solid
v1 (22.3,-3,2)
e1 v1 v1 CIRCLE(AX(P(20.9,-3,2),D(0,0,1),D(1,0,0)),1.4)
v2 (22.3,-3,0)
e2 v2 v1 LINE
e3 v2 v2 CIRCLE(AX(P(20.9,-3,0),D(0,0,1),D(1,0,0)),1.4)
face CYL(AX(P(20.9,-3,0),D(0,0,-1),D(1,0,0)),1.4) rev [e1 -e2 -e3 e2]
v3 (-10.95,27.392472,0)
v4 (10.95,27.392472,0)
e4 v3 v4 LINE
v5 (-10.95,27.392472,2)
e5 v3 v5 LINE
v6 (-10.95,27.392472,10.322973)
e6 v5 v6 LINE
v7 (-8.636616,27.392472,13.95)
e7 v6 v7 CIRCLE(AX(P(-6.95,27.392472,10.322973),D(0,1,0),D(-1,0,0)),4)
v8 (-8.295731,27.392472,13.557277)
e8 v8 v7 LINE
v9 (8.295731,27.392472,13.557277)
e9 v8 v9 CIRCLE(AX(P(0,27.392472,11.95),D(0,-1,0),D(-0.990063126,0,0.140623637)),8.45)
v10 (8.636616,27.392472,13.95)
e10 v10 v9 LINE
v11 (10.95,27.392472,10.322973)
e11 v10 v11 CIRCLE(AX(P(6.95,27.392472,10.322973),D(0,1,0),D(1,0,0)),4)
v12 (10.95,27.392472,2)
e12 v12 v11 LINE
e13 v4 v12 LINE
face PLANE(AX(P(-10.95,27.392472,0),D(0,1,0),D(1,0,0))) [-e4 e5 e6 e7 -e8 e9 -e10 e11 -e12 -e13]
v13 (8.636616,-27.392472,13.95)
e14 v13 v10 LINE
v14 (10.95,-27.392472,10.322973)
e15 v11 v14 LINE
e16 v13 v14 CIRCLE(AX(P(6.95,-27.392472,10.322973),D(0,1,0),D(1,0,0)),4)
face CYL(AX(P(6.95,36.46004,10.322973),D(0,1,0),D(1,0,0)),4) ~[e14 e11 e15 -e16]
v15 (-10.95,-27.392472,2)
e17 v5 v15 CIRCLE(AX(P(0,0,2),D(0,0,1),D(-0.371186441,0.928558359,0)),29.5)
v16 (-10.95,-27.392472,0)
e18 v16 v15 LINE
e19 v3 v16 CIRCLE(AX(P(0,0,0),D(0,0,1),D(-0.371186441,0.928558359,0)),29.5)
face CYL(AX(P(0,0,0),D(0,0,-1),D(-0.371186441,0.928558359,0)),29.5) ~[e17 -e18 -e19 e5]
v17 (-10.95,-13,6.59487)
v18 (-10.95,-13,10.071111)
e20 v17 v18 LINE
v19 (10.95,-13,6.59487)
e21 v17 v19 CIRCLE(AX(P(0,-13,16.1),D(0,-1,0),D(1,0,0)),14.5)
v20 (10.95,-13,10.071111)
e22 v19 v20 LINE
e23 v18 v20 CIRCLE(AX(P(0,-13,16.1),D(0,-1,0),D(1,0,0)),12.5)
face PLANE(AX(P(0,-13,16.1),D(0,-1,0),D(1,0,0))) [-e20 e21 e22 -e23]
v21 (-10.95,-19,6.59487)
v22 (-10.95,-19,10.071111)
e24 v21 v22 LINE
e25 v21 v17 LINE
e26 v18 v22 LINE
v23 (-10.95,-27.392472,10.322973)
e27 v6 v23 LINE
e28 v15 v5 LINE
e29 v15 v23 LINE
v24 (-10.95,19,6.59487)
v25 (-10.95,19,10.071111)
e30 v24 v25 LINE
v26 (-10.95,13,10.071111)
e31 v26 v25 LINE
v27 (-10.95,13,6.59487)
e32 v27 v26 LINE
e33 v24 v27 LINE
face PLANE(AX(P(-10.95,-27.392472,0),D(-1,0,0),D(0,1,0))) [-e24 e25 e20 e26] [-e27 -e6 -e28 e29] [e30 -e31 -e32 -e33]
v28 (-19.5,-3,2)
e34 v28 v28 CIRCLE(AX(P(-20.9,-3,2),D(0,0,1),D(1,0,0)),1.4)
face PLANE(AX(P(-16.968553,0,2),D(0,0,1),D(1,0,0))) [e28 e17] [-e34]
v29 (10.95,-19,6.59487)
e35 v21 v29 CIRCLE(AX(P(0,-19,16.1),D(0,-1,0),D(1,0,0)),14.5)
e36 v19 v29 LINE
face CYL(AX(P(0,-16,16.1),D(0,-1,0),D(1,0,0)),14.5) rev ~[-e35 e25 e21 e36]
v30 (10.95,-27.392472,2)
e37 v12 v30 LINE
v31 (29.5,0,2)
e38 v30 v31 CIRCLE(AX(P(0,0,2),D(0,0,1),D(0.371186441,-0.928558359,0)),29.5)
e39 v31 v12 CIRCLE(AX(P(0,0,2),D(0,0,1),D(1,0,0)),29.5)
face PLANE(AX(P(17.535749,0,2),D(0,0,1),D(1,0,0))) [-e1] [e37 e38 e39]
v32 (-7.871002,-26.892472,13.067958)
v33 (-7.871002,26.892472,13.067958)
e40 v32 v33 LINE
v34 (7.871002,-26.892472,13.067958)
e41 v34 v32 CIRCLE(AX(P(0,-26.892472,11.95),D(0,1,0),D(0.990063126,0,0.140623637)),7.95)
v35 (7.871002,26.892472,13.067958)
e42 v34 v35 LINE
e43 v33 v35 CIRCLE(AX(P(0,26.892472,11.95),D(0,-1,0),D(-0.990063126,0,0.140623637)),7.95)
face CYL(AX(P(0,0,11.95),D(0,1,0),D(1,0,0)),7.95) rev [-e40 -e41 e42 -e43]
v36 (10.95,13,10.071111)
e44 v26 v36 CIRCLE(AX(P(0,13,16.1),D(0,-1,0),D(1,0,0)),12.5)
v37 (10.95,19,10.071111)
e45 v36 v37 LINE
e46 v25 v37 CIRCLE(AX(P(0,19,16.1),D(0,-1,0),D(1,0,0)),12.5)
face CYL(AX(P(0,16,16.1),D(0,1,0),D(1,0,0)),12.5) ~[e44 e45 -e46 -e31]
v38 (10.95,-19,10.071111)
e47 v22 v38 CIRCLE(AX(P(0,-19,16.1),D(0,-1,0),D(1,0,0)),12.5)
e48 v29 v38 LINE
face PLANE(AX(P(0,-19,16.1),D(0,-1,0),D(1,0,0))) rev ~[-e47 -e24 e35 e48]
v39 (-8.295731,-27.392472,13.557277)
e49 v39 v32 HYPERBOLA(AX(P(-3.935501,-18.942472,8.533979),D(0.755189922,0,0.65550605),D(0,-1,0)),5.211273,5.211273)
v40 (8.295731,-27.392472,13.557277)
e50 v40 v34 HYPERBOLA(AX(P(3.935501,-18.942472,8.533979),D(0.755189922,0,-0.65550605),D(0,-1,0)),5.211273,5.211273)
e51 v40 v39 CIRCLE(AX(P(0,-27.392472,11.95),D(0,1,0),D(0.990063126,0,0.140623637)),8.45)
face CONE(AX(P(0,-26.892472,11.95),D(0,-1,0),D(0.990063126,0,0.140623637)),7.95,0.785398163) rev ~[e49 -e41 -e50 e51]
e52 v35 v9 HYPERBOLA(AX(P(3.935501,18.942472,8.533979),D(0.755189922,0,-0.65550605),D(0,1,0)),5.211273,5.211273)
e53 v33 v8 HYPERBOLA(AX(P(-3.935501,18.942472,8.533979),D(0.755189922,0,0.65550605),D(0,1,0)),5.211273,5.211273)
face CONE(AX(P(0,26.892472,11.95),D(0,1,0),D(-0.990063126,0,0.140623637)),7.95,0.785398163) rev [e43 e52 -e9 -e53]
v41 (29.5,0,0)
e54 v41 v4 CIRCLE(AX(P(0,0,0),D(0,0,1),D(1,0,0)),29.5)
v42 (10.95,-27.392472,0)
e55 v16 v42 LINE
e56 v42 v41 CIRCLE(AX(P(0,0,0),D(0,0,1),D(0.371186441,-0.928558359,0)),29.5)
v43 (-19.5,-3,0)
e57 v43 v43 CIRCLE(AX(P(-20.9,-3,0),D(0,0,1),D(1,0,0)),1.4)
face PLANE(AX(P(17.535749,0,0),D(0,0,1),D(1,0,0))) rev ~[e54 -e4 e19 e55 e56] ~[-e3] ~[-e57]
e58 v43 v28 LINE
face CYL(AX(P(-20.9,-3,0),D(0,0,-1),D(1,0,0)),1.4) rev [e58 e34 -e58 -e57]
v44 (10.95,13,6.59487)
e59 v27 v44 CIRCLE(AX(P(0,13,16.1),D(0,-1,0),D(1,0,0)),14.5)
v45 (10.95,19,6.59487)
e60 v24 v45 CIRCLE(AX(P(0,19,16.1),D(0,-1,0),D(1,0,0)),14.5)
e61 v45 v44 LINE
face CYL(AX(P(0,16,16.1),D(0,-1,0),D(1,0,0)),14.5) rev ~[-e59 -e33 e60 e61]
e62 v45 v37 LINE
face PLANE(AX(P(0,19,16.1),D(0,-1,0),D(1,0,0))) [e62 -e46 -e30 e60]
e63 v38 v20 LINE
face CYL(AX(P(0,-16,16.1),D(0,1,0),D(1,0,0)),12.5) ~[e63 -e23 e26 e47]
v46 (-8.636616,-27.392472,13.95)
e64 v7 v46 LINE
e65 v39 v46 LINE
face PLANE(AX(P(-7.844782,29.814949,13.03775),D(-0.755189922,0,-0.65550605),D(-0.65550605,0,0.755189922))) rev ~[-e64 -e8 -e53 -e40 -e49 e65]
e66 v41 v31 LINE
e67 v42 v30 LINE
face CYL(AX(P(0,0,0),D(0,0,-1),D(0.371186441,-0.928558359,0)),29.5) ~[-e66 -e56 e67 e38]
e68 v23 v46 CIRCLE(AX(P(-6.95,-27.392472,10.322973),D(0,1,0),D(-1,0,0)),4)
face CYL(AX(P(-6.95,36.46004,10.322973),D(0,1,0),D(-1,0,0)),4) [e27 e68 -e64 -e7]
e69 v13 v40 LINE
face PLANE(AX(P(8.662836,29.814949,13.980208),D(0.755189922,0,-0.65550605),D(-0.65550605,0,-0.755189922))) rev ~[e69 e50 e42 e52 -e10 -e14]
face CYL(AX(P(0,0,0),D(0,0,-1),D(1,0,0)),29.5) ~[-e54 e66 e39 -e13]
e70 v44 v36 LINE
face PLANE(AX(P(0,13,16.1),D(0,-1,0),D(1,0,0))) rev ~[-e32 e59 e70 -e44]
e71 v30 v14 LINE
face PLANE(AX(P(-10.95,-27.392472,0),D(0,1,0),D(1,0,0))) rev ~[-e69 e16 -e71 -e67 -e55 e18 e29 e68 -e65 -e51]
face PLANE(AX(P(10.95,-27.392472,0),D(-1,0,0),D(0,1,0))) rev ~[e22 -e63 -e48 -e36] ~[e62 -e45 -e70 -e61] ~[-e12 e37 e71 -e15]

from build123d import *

# Parameters (mm, degrees)
F0_W          = 21.9
F0_H          = 54.784943187
F2_DEPTH      = 13.95
F0_R          = 1.4
F3_DEPTH      = 2
F1_R          = 7.95
F4_DEPTH      = 27.3934715935
F4_DEPTH_BACK = 27.3934715935
F7_R          = 14.5
F7_R_2        = 12.5
F8_R          = 14.5
F8_R_2        = 12.5
F9_DEPTH      = 3
F10_T1_DEPTH  = 59.6298977105
F11_T1_DEPTH  = 72.9200798033
F12_SIZE      = 0.5


# Not quite as in the source:
# - a fillet or chamfer that OpenCascade refuses, or shapes differently, is made with other operations: its cross-section is extruded or revolved along the edge and cut away or added


with BuildPart() as f2:
    # F0 (on Top) → F2 (new body)
    with BuildSketch(Plane.XY):
        Rectangle(F0_W, F0_H)
    extrude(amount=F2_DEPTH)

    # F0 (on Top) → F3 (join)
    with BuildSketch(Plane.XY):
        with BuildLine():
            ThreePointArc((10.95, -27.3924715935), (24.4261642507, -16.5412363504), (29.5, 0))
            ThreePointArc((29.5, 0), (24.4261642507, 16.5412363504), (10.95, 27.3924715935))
            Line((10.95, 27.3924715935), (10.95, -27.3924715935))
        make_face()
        with Locations((20.9, -3)):
            Circle(F0_R, mode=Mode.SUBTRACT)
        with BuildLine():
            Line((-10.95, -27.3924715935), (-10.95, 27.3924715935))
            ThreePointArc((-10.95, 27.3924715935), (-29.5, 0), (-10.95, -27.3924715935))
        make_face()
        with Locations((-20.9, -3)):
            Circle(F0_R, mode=Mode.SUBTRACT)
    extrude(amount=F3_DEPTH)

    # F1 (on Front) → F4 (cut, two sides)
    with BuildSketch(Plane.XZ) as f4_sk:
        with Locations((0, 11.95)):
            Circle(F1_R)
    extrude(amount=-F4_DEPTH, mode=Mode.SUBTRACT)
    extrude(f4_sk.sketch, amount=F4_DEPTH_BACK, mode=Mode.SUBTRACT)

    # F7 (on offset) + F8 (on offset) → F9 (cut, symmetric)
    with BuildSketch(Plane.XZ.offset(16)):
        with Locations((0, 16.1)):
            Circle(F7_R)
        with Locations((0, 16.1)):
            Circle(F7_R_2, mode=Mode.SUBTRACT)
    with BuildSketch(Plane.XZ.offset(-16)):
        with Locations((0, 16.1)):
            Circle(F8_R)
        with Locations((0, 16.1)):
            Circle(F8_R_2, mode=Mode.SUBTRACT)
    extrude(amount=F9_DEPTH, both=True, mode=Mode.SUBTRACT)

    # F10: chamfer of 1 on 2 edges, made by hand

    # F10_s2 → F10_t1 (cut)
    with BuildSketch(Plane.XZ.offset(-29.8149488552)):
        with BuildLine():
            Line((-7.8447816072, 13.0377503134), (-8.6628360241, 13.9802075969))
            Line((-8.6628360241, 13.9802075969), (-8.6628360241, 14.0002075969))
            ThreePointArc((-8.6628360241, 14.0002075969), (-8.178576054, 13.97), (-7.694316084, 13.97))
            Line((-7.694316084, 13.97), (-7.6749593139, 13.9449685535))
            ThreePointArc((-7.6749593139, 13.9449685535), (-7.7779305741, 13.4955406772), (-7.8249803447, 13.0349378407))
            Line((-7.8249803447, 13.0349378407), (-7.8447816072, 13.0377503134))
        make_face()
        with BuildLine():
            Line((8.6628360241, 13.9802075969), (7.8447816072, 13.0377503134))
            Line((7.8447816072, 13.0377503134), (7.8249803447, 13.0349378407))
            ThreePointArc((7.8249803447, 13.0349378407), (7.7779305741, 13.4955406772), (7.6749593139, 13.9449685535))
            Line((7.6749593139, 13.9449685535), (7.694316084, 13.97))
            ThreePointArc((7.694316084, 13.97), (8.178576054, 13.97), (8.6628360241, 14.0002075969))
            Line((8.6628360241, 14.0002075969), (8.6628360241, 13.9802075969))
        make_face()
    extrude(amount=F10_T1_DEPTH, mode=Mode.SUBTRACT)

    # F11: fillet of radius 4 on 2 edges, made by hand

    # F11_s2 → F11_t1 (cut)
    with BuildSketch(Plane.XZ.offset(-36.4600399016)):
        with BuildLine():
            ThreePointArc((10.95, 10.3229726767), (10.3224222102, 12.4739651072), (8.6366157821, 13.95))
            Line((8.6366157821, 13.95), (10.95, 13.95))
            Line((10.95, 13.95), (10.95, 10.3229726767))
        make_face()
        with BuildLine():
            ThreePointArc((-10.95, 10.3229726767), (-10.3224222102, 12.4739651072), (-8.6366157821, 13.95))
            Line((-8.6366157821, 13.95), (-10.95, 13.95))
            Line((-10.95, 13.95), (-10.95, 10.3229726767))
        make_face()
    extrude(amount=F11_T1_DEPTH, mode=Mode.SUBTRACT)

    # F12
    f12_edges = [f2.edges().sort_by_distance(p)[0] for p in [
        (0, 27.392472, 4),
        (0, -27.392472, 4),
    ]]
    chamfer(f12_edges, length=F12_SIZE)


solid = f2.part
